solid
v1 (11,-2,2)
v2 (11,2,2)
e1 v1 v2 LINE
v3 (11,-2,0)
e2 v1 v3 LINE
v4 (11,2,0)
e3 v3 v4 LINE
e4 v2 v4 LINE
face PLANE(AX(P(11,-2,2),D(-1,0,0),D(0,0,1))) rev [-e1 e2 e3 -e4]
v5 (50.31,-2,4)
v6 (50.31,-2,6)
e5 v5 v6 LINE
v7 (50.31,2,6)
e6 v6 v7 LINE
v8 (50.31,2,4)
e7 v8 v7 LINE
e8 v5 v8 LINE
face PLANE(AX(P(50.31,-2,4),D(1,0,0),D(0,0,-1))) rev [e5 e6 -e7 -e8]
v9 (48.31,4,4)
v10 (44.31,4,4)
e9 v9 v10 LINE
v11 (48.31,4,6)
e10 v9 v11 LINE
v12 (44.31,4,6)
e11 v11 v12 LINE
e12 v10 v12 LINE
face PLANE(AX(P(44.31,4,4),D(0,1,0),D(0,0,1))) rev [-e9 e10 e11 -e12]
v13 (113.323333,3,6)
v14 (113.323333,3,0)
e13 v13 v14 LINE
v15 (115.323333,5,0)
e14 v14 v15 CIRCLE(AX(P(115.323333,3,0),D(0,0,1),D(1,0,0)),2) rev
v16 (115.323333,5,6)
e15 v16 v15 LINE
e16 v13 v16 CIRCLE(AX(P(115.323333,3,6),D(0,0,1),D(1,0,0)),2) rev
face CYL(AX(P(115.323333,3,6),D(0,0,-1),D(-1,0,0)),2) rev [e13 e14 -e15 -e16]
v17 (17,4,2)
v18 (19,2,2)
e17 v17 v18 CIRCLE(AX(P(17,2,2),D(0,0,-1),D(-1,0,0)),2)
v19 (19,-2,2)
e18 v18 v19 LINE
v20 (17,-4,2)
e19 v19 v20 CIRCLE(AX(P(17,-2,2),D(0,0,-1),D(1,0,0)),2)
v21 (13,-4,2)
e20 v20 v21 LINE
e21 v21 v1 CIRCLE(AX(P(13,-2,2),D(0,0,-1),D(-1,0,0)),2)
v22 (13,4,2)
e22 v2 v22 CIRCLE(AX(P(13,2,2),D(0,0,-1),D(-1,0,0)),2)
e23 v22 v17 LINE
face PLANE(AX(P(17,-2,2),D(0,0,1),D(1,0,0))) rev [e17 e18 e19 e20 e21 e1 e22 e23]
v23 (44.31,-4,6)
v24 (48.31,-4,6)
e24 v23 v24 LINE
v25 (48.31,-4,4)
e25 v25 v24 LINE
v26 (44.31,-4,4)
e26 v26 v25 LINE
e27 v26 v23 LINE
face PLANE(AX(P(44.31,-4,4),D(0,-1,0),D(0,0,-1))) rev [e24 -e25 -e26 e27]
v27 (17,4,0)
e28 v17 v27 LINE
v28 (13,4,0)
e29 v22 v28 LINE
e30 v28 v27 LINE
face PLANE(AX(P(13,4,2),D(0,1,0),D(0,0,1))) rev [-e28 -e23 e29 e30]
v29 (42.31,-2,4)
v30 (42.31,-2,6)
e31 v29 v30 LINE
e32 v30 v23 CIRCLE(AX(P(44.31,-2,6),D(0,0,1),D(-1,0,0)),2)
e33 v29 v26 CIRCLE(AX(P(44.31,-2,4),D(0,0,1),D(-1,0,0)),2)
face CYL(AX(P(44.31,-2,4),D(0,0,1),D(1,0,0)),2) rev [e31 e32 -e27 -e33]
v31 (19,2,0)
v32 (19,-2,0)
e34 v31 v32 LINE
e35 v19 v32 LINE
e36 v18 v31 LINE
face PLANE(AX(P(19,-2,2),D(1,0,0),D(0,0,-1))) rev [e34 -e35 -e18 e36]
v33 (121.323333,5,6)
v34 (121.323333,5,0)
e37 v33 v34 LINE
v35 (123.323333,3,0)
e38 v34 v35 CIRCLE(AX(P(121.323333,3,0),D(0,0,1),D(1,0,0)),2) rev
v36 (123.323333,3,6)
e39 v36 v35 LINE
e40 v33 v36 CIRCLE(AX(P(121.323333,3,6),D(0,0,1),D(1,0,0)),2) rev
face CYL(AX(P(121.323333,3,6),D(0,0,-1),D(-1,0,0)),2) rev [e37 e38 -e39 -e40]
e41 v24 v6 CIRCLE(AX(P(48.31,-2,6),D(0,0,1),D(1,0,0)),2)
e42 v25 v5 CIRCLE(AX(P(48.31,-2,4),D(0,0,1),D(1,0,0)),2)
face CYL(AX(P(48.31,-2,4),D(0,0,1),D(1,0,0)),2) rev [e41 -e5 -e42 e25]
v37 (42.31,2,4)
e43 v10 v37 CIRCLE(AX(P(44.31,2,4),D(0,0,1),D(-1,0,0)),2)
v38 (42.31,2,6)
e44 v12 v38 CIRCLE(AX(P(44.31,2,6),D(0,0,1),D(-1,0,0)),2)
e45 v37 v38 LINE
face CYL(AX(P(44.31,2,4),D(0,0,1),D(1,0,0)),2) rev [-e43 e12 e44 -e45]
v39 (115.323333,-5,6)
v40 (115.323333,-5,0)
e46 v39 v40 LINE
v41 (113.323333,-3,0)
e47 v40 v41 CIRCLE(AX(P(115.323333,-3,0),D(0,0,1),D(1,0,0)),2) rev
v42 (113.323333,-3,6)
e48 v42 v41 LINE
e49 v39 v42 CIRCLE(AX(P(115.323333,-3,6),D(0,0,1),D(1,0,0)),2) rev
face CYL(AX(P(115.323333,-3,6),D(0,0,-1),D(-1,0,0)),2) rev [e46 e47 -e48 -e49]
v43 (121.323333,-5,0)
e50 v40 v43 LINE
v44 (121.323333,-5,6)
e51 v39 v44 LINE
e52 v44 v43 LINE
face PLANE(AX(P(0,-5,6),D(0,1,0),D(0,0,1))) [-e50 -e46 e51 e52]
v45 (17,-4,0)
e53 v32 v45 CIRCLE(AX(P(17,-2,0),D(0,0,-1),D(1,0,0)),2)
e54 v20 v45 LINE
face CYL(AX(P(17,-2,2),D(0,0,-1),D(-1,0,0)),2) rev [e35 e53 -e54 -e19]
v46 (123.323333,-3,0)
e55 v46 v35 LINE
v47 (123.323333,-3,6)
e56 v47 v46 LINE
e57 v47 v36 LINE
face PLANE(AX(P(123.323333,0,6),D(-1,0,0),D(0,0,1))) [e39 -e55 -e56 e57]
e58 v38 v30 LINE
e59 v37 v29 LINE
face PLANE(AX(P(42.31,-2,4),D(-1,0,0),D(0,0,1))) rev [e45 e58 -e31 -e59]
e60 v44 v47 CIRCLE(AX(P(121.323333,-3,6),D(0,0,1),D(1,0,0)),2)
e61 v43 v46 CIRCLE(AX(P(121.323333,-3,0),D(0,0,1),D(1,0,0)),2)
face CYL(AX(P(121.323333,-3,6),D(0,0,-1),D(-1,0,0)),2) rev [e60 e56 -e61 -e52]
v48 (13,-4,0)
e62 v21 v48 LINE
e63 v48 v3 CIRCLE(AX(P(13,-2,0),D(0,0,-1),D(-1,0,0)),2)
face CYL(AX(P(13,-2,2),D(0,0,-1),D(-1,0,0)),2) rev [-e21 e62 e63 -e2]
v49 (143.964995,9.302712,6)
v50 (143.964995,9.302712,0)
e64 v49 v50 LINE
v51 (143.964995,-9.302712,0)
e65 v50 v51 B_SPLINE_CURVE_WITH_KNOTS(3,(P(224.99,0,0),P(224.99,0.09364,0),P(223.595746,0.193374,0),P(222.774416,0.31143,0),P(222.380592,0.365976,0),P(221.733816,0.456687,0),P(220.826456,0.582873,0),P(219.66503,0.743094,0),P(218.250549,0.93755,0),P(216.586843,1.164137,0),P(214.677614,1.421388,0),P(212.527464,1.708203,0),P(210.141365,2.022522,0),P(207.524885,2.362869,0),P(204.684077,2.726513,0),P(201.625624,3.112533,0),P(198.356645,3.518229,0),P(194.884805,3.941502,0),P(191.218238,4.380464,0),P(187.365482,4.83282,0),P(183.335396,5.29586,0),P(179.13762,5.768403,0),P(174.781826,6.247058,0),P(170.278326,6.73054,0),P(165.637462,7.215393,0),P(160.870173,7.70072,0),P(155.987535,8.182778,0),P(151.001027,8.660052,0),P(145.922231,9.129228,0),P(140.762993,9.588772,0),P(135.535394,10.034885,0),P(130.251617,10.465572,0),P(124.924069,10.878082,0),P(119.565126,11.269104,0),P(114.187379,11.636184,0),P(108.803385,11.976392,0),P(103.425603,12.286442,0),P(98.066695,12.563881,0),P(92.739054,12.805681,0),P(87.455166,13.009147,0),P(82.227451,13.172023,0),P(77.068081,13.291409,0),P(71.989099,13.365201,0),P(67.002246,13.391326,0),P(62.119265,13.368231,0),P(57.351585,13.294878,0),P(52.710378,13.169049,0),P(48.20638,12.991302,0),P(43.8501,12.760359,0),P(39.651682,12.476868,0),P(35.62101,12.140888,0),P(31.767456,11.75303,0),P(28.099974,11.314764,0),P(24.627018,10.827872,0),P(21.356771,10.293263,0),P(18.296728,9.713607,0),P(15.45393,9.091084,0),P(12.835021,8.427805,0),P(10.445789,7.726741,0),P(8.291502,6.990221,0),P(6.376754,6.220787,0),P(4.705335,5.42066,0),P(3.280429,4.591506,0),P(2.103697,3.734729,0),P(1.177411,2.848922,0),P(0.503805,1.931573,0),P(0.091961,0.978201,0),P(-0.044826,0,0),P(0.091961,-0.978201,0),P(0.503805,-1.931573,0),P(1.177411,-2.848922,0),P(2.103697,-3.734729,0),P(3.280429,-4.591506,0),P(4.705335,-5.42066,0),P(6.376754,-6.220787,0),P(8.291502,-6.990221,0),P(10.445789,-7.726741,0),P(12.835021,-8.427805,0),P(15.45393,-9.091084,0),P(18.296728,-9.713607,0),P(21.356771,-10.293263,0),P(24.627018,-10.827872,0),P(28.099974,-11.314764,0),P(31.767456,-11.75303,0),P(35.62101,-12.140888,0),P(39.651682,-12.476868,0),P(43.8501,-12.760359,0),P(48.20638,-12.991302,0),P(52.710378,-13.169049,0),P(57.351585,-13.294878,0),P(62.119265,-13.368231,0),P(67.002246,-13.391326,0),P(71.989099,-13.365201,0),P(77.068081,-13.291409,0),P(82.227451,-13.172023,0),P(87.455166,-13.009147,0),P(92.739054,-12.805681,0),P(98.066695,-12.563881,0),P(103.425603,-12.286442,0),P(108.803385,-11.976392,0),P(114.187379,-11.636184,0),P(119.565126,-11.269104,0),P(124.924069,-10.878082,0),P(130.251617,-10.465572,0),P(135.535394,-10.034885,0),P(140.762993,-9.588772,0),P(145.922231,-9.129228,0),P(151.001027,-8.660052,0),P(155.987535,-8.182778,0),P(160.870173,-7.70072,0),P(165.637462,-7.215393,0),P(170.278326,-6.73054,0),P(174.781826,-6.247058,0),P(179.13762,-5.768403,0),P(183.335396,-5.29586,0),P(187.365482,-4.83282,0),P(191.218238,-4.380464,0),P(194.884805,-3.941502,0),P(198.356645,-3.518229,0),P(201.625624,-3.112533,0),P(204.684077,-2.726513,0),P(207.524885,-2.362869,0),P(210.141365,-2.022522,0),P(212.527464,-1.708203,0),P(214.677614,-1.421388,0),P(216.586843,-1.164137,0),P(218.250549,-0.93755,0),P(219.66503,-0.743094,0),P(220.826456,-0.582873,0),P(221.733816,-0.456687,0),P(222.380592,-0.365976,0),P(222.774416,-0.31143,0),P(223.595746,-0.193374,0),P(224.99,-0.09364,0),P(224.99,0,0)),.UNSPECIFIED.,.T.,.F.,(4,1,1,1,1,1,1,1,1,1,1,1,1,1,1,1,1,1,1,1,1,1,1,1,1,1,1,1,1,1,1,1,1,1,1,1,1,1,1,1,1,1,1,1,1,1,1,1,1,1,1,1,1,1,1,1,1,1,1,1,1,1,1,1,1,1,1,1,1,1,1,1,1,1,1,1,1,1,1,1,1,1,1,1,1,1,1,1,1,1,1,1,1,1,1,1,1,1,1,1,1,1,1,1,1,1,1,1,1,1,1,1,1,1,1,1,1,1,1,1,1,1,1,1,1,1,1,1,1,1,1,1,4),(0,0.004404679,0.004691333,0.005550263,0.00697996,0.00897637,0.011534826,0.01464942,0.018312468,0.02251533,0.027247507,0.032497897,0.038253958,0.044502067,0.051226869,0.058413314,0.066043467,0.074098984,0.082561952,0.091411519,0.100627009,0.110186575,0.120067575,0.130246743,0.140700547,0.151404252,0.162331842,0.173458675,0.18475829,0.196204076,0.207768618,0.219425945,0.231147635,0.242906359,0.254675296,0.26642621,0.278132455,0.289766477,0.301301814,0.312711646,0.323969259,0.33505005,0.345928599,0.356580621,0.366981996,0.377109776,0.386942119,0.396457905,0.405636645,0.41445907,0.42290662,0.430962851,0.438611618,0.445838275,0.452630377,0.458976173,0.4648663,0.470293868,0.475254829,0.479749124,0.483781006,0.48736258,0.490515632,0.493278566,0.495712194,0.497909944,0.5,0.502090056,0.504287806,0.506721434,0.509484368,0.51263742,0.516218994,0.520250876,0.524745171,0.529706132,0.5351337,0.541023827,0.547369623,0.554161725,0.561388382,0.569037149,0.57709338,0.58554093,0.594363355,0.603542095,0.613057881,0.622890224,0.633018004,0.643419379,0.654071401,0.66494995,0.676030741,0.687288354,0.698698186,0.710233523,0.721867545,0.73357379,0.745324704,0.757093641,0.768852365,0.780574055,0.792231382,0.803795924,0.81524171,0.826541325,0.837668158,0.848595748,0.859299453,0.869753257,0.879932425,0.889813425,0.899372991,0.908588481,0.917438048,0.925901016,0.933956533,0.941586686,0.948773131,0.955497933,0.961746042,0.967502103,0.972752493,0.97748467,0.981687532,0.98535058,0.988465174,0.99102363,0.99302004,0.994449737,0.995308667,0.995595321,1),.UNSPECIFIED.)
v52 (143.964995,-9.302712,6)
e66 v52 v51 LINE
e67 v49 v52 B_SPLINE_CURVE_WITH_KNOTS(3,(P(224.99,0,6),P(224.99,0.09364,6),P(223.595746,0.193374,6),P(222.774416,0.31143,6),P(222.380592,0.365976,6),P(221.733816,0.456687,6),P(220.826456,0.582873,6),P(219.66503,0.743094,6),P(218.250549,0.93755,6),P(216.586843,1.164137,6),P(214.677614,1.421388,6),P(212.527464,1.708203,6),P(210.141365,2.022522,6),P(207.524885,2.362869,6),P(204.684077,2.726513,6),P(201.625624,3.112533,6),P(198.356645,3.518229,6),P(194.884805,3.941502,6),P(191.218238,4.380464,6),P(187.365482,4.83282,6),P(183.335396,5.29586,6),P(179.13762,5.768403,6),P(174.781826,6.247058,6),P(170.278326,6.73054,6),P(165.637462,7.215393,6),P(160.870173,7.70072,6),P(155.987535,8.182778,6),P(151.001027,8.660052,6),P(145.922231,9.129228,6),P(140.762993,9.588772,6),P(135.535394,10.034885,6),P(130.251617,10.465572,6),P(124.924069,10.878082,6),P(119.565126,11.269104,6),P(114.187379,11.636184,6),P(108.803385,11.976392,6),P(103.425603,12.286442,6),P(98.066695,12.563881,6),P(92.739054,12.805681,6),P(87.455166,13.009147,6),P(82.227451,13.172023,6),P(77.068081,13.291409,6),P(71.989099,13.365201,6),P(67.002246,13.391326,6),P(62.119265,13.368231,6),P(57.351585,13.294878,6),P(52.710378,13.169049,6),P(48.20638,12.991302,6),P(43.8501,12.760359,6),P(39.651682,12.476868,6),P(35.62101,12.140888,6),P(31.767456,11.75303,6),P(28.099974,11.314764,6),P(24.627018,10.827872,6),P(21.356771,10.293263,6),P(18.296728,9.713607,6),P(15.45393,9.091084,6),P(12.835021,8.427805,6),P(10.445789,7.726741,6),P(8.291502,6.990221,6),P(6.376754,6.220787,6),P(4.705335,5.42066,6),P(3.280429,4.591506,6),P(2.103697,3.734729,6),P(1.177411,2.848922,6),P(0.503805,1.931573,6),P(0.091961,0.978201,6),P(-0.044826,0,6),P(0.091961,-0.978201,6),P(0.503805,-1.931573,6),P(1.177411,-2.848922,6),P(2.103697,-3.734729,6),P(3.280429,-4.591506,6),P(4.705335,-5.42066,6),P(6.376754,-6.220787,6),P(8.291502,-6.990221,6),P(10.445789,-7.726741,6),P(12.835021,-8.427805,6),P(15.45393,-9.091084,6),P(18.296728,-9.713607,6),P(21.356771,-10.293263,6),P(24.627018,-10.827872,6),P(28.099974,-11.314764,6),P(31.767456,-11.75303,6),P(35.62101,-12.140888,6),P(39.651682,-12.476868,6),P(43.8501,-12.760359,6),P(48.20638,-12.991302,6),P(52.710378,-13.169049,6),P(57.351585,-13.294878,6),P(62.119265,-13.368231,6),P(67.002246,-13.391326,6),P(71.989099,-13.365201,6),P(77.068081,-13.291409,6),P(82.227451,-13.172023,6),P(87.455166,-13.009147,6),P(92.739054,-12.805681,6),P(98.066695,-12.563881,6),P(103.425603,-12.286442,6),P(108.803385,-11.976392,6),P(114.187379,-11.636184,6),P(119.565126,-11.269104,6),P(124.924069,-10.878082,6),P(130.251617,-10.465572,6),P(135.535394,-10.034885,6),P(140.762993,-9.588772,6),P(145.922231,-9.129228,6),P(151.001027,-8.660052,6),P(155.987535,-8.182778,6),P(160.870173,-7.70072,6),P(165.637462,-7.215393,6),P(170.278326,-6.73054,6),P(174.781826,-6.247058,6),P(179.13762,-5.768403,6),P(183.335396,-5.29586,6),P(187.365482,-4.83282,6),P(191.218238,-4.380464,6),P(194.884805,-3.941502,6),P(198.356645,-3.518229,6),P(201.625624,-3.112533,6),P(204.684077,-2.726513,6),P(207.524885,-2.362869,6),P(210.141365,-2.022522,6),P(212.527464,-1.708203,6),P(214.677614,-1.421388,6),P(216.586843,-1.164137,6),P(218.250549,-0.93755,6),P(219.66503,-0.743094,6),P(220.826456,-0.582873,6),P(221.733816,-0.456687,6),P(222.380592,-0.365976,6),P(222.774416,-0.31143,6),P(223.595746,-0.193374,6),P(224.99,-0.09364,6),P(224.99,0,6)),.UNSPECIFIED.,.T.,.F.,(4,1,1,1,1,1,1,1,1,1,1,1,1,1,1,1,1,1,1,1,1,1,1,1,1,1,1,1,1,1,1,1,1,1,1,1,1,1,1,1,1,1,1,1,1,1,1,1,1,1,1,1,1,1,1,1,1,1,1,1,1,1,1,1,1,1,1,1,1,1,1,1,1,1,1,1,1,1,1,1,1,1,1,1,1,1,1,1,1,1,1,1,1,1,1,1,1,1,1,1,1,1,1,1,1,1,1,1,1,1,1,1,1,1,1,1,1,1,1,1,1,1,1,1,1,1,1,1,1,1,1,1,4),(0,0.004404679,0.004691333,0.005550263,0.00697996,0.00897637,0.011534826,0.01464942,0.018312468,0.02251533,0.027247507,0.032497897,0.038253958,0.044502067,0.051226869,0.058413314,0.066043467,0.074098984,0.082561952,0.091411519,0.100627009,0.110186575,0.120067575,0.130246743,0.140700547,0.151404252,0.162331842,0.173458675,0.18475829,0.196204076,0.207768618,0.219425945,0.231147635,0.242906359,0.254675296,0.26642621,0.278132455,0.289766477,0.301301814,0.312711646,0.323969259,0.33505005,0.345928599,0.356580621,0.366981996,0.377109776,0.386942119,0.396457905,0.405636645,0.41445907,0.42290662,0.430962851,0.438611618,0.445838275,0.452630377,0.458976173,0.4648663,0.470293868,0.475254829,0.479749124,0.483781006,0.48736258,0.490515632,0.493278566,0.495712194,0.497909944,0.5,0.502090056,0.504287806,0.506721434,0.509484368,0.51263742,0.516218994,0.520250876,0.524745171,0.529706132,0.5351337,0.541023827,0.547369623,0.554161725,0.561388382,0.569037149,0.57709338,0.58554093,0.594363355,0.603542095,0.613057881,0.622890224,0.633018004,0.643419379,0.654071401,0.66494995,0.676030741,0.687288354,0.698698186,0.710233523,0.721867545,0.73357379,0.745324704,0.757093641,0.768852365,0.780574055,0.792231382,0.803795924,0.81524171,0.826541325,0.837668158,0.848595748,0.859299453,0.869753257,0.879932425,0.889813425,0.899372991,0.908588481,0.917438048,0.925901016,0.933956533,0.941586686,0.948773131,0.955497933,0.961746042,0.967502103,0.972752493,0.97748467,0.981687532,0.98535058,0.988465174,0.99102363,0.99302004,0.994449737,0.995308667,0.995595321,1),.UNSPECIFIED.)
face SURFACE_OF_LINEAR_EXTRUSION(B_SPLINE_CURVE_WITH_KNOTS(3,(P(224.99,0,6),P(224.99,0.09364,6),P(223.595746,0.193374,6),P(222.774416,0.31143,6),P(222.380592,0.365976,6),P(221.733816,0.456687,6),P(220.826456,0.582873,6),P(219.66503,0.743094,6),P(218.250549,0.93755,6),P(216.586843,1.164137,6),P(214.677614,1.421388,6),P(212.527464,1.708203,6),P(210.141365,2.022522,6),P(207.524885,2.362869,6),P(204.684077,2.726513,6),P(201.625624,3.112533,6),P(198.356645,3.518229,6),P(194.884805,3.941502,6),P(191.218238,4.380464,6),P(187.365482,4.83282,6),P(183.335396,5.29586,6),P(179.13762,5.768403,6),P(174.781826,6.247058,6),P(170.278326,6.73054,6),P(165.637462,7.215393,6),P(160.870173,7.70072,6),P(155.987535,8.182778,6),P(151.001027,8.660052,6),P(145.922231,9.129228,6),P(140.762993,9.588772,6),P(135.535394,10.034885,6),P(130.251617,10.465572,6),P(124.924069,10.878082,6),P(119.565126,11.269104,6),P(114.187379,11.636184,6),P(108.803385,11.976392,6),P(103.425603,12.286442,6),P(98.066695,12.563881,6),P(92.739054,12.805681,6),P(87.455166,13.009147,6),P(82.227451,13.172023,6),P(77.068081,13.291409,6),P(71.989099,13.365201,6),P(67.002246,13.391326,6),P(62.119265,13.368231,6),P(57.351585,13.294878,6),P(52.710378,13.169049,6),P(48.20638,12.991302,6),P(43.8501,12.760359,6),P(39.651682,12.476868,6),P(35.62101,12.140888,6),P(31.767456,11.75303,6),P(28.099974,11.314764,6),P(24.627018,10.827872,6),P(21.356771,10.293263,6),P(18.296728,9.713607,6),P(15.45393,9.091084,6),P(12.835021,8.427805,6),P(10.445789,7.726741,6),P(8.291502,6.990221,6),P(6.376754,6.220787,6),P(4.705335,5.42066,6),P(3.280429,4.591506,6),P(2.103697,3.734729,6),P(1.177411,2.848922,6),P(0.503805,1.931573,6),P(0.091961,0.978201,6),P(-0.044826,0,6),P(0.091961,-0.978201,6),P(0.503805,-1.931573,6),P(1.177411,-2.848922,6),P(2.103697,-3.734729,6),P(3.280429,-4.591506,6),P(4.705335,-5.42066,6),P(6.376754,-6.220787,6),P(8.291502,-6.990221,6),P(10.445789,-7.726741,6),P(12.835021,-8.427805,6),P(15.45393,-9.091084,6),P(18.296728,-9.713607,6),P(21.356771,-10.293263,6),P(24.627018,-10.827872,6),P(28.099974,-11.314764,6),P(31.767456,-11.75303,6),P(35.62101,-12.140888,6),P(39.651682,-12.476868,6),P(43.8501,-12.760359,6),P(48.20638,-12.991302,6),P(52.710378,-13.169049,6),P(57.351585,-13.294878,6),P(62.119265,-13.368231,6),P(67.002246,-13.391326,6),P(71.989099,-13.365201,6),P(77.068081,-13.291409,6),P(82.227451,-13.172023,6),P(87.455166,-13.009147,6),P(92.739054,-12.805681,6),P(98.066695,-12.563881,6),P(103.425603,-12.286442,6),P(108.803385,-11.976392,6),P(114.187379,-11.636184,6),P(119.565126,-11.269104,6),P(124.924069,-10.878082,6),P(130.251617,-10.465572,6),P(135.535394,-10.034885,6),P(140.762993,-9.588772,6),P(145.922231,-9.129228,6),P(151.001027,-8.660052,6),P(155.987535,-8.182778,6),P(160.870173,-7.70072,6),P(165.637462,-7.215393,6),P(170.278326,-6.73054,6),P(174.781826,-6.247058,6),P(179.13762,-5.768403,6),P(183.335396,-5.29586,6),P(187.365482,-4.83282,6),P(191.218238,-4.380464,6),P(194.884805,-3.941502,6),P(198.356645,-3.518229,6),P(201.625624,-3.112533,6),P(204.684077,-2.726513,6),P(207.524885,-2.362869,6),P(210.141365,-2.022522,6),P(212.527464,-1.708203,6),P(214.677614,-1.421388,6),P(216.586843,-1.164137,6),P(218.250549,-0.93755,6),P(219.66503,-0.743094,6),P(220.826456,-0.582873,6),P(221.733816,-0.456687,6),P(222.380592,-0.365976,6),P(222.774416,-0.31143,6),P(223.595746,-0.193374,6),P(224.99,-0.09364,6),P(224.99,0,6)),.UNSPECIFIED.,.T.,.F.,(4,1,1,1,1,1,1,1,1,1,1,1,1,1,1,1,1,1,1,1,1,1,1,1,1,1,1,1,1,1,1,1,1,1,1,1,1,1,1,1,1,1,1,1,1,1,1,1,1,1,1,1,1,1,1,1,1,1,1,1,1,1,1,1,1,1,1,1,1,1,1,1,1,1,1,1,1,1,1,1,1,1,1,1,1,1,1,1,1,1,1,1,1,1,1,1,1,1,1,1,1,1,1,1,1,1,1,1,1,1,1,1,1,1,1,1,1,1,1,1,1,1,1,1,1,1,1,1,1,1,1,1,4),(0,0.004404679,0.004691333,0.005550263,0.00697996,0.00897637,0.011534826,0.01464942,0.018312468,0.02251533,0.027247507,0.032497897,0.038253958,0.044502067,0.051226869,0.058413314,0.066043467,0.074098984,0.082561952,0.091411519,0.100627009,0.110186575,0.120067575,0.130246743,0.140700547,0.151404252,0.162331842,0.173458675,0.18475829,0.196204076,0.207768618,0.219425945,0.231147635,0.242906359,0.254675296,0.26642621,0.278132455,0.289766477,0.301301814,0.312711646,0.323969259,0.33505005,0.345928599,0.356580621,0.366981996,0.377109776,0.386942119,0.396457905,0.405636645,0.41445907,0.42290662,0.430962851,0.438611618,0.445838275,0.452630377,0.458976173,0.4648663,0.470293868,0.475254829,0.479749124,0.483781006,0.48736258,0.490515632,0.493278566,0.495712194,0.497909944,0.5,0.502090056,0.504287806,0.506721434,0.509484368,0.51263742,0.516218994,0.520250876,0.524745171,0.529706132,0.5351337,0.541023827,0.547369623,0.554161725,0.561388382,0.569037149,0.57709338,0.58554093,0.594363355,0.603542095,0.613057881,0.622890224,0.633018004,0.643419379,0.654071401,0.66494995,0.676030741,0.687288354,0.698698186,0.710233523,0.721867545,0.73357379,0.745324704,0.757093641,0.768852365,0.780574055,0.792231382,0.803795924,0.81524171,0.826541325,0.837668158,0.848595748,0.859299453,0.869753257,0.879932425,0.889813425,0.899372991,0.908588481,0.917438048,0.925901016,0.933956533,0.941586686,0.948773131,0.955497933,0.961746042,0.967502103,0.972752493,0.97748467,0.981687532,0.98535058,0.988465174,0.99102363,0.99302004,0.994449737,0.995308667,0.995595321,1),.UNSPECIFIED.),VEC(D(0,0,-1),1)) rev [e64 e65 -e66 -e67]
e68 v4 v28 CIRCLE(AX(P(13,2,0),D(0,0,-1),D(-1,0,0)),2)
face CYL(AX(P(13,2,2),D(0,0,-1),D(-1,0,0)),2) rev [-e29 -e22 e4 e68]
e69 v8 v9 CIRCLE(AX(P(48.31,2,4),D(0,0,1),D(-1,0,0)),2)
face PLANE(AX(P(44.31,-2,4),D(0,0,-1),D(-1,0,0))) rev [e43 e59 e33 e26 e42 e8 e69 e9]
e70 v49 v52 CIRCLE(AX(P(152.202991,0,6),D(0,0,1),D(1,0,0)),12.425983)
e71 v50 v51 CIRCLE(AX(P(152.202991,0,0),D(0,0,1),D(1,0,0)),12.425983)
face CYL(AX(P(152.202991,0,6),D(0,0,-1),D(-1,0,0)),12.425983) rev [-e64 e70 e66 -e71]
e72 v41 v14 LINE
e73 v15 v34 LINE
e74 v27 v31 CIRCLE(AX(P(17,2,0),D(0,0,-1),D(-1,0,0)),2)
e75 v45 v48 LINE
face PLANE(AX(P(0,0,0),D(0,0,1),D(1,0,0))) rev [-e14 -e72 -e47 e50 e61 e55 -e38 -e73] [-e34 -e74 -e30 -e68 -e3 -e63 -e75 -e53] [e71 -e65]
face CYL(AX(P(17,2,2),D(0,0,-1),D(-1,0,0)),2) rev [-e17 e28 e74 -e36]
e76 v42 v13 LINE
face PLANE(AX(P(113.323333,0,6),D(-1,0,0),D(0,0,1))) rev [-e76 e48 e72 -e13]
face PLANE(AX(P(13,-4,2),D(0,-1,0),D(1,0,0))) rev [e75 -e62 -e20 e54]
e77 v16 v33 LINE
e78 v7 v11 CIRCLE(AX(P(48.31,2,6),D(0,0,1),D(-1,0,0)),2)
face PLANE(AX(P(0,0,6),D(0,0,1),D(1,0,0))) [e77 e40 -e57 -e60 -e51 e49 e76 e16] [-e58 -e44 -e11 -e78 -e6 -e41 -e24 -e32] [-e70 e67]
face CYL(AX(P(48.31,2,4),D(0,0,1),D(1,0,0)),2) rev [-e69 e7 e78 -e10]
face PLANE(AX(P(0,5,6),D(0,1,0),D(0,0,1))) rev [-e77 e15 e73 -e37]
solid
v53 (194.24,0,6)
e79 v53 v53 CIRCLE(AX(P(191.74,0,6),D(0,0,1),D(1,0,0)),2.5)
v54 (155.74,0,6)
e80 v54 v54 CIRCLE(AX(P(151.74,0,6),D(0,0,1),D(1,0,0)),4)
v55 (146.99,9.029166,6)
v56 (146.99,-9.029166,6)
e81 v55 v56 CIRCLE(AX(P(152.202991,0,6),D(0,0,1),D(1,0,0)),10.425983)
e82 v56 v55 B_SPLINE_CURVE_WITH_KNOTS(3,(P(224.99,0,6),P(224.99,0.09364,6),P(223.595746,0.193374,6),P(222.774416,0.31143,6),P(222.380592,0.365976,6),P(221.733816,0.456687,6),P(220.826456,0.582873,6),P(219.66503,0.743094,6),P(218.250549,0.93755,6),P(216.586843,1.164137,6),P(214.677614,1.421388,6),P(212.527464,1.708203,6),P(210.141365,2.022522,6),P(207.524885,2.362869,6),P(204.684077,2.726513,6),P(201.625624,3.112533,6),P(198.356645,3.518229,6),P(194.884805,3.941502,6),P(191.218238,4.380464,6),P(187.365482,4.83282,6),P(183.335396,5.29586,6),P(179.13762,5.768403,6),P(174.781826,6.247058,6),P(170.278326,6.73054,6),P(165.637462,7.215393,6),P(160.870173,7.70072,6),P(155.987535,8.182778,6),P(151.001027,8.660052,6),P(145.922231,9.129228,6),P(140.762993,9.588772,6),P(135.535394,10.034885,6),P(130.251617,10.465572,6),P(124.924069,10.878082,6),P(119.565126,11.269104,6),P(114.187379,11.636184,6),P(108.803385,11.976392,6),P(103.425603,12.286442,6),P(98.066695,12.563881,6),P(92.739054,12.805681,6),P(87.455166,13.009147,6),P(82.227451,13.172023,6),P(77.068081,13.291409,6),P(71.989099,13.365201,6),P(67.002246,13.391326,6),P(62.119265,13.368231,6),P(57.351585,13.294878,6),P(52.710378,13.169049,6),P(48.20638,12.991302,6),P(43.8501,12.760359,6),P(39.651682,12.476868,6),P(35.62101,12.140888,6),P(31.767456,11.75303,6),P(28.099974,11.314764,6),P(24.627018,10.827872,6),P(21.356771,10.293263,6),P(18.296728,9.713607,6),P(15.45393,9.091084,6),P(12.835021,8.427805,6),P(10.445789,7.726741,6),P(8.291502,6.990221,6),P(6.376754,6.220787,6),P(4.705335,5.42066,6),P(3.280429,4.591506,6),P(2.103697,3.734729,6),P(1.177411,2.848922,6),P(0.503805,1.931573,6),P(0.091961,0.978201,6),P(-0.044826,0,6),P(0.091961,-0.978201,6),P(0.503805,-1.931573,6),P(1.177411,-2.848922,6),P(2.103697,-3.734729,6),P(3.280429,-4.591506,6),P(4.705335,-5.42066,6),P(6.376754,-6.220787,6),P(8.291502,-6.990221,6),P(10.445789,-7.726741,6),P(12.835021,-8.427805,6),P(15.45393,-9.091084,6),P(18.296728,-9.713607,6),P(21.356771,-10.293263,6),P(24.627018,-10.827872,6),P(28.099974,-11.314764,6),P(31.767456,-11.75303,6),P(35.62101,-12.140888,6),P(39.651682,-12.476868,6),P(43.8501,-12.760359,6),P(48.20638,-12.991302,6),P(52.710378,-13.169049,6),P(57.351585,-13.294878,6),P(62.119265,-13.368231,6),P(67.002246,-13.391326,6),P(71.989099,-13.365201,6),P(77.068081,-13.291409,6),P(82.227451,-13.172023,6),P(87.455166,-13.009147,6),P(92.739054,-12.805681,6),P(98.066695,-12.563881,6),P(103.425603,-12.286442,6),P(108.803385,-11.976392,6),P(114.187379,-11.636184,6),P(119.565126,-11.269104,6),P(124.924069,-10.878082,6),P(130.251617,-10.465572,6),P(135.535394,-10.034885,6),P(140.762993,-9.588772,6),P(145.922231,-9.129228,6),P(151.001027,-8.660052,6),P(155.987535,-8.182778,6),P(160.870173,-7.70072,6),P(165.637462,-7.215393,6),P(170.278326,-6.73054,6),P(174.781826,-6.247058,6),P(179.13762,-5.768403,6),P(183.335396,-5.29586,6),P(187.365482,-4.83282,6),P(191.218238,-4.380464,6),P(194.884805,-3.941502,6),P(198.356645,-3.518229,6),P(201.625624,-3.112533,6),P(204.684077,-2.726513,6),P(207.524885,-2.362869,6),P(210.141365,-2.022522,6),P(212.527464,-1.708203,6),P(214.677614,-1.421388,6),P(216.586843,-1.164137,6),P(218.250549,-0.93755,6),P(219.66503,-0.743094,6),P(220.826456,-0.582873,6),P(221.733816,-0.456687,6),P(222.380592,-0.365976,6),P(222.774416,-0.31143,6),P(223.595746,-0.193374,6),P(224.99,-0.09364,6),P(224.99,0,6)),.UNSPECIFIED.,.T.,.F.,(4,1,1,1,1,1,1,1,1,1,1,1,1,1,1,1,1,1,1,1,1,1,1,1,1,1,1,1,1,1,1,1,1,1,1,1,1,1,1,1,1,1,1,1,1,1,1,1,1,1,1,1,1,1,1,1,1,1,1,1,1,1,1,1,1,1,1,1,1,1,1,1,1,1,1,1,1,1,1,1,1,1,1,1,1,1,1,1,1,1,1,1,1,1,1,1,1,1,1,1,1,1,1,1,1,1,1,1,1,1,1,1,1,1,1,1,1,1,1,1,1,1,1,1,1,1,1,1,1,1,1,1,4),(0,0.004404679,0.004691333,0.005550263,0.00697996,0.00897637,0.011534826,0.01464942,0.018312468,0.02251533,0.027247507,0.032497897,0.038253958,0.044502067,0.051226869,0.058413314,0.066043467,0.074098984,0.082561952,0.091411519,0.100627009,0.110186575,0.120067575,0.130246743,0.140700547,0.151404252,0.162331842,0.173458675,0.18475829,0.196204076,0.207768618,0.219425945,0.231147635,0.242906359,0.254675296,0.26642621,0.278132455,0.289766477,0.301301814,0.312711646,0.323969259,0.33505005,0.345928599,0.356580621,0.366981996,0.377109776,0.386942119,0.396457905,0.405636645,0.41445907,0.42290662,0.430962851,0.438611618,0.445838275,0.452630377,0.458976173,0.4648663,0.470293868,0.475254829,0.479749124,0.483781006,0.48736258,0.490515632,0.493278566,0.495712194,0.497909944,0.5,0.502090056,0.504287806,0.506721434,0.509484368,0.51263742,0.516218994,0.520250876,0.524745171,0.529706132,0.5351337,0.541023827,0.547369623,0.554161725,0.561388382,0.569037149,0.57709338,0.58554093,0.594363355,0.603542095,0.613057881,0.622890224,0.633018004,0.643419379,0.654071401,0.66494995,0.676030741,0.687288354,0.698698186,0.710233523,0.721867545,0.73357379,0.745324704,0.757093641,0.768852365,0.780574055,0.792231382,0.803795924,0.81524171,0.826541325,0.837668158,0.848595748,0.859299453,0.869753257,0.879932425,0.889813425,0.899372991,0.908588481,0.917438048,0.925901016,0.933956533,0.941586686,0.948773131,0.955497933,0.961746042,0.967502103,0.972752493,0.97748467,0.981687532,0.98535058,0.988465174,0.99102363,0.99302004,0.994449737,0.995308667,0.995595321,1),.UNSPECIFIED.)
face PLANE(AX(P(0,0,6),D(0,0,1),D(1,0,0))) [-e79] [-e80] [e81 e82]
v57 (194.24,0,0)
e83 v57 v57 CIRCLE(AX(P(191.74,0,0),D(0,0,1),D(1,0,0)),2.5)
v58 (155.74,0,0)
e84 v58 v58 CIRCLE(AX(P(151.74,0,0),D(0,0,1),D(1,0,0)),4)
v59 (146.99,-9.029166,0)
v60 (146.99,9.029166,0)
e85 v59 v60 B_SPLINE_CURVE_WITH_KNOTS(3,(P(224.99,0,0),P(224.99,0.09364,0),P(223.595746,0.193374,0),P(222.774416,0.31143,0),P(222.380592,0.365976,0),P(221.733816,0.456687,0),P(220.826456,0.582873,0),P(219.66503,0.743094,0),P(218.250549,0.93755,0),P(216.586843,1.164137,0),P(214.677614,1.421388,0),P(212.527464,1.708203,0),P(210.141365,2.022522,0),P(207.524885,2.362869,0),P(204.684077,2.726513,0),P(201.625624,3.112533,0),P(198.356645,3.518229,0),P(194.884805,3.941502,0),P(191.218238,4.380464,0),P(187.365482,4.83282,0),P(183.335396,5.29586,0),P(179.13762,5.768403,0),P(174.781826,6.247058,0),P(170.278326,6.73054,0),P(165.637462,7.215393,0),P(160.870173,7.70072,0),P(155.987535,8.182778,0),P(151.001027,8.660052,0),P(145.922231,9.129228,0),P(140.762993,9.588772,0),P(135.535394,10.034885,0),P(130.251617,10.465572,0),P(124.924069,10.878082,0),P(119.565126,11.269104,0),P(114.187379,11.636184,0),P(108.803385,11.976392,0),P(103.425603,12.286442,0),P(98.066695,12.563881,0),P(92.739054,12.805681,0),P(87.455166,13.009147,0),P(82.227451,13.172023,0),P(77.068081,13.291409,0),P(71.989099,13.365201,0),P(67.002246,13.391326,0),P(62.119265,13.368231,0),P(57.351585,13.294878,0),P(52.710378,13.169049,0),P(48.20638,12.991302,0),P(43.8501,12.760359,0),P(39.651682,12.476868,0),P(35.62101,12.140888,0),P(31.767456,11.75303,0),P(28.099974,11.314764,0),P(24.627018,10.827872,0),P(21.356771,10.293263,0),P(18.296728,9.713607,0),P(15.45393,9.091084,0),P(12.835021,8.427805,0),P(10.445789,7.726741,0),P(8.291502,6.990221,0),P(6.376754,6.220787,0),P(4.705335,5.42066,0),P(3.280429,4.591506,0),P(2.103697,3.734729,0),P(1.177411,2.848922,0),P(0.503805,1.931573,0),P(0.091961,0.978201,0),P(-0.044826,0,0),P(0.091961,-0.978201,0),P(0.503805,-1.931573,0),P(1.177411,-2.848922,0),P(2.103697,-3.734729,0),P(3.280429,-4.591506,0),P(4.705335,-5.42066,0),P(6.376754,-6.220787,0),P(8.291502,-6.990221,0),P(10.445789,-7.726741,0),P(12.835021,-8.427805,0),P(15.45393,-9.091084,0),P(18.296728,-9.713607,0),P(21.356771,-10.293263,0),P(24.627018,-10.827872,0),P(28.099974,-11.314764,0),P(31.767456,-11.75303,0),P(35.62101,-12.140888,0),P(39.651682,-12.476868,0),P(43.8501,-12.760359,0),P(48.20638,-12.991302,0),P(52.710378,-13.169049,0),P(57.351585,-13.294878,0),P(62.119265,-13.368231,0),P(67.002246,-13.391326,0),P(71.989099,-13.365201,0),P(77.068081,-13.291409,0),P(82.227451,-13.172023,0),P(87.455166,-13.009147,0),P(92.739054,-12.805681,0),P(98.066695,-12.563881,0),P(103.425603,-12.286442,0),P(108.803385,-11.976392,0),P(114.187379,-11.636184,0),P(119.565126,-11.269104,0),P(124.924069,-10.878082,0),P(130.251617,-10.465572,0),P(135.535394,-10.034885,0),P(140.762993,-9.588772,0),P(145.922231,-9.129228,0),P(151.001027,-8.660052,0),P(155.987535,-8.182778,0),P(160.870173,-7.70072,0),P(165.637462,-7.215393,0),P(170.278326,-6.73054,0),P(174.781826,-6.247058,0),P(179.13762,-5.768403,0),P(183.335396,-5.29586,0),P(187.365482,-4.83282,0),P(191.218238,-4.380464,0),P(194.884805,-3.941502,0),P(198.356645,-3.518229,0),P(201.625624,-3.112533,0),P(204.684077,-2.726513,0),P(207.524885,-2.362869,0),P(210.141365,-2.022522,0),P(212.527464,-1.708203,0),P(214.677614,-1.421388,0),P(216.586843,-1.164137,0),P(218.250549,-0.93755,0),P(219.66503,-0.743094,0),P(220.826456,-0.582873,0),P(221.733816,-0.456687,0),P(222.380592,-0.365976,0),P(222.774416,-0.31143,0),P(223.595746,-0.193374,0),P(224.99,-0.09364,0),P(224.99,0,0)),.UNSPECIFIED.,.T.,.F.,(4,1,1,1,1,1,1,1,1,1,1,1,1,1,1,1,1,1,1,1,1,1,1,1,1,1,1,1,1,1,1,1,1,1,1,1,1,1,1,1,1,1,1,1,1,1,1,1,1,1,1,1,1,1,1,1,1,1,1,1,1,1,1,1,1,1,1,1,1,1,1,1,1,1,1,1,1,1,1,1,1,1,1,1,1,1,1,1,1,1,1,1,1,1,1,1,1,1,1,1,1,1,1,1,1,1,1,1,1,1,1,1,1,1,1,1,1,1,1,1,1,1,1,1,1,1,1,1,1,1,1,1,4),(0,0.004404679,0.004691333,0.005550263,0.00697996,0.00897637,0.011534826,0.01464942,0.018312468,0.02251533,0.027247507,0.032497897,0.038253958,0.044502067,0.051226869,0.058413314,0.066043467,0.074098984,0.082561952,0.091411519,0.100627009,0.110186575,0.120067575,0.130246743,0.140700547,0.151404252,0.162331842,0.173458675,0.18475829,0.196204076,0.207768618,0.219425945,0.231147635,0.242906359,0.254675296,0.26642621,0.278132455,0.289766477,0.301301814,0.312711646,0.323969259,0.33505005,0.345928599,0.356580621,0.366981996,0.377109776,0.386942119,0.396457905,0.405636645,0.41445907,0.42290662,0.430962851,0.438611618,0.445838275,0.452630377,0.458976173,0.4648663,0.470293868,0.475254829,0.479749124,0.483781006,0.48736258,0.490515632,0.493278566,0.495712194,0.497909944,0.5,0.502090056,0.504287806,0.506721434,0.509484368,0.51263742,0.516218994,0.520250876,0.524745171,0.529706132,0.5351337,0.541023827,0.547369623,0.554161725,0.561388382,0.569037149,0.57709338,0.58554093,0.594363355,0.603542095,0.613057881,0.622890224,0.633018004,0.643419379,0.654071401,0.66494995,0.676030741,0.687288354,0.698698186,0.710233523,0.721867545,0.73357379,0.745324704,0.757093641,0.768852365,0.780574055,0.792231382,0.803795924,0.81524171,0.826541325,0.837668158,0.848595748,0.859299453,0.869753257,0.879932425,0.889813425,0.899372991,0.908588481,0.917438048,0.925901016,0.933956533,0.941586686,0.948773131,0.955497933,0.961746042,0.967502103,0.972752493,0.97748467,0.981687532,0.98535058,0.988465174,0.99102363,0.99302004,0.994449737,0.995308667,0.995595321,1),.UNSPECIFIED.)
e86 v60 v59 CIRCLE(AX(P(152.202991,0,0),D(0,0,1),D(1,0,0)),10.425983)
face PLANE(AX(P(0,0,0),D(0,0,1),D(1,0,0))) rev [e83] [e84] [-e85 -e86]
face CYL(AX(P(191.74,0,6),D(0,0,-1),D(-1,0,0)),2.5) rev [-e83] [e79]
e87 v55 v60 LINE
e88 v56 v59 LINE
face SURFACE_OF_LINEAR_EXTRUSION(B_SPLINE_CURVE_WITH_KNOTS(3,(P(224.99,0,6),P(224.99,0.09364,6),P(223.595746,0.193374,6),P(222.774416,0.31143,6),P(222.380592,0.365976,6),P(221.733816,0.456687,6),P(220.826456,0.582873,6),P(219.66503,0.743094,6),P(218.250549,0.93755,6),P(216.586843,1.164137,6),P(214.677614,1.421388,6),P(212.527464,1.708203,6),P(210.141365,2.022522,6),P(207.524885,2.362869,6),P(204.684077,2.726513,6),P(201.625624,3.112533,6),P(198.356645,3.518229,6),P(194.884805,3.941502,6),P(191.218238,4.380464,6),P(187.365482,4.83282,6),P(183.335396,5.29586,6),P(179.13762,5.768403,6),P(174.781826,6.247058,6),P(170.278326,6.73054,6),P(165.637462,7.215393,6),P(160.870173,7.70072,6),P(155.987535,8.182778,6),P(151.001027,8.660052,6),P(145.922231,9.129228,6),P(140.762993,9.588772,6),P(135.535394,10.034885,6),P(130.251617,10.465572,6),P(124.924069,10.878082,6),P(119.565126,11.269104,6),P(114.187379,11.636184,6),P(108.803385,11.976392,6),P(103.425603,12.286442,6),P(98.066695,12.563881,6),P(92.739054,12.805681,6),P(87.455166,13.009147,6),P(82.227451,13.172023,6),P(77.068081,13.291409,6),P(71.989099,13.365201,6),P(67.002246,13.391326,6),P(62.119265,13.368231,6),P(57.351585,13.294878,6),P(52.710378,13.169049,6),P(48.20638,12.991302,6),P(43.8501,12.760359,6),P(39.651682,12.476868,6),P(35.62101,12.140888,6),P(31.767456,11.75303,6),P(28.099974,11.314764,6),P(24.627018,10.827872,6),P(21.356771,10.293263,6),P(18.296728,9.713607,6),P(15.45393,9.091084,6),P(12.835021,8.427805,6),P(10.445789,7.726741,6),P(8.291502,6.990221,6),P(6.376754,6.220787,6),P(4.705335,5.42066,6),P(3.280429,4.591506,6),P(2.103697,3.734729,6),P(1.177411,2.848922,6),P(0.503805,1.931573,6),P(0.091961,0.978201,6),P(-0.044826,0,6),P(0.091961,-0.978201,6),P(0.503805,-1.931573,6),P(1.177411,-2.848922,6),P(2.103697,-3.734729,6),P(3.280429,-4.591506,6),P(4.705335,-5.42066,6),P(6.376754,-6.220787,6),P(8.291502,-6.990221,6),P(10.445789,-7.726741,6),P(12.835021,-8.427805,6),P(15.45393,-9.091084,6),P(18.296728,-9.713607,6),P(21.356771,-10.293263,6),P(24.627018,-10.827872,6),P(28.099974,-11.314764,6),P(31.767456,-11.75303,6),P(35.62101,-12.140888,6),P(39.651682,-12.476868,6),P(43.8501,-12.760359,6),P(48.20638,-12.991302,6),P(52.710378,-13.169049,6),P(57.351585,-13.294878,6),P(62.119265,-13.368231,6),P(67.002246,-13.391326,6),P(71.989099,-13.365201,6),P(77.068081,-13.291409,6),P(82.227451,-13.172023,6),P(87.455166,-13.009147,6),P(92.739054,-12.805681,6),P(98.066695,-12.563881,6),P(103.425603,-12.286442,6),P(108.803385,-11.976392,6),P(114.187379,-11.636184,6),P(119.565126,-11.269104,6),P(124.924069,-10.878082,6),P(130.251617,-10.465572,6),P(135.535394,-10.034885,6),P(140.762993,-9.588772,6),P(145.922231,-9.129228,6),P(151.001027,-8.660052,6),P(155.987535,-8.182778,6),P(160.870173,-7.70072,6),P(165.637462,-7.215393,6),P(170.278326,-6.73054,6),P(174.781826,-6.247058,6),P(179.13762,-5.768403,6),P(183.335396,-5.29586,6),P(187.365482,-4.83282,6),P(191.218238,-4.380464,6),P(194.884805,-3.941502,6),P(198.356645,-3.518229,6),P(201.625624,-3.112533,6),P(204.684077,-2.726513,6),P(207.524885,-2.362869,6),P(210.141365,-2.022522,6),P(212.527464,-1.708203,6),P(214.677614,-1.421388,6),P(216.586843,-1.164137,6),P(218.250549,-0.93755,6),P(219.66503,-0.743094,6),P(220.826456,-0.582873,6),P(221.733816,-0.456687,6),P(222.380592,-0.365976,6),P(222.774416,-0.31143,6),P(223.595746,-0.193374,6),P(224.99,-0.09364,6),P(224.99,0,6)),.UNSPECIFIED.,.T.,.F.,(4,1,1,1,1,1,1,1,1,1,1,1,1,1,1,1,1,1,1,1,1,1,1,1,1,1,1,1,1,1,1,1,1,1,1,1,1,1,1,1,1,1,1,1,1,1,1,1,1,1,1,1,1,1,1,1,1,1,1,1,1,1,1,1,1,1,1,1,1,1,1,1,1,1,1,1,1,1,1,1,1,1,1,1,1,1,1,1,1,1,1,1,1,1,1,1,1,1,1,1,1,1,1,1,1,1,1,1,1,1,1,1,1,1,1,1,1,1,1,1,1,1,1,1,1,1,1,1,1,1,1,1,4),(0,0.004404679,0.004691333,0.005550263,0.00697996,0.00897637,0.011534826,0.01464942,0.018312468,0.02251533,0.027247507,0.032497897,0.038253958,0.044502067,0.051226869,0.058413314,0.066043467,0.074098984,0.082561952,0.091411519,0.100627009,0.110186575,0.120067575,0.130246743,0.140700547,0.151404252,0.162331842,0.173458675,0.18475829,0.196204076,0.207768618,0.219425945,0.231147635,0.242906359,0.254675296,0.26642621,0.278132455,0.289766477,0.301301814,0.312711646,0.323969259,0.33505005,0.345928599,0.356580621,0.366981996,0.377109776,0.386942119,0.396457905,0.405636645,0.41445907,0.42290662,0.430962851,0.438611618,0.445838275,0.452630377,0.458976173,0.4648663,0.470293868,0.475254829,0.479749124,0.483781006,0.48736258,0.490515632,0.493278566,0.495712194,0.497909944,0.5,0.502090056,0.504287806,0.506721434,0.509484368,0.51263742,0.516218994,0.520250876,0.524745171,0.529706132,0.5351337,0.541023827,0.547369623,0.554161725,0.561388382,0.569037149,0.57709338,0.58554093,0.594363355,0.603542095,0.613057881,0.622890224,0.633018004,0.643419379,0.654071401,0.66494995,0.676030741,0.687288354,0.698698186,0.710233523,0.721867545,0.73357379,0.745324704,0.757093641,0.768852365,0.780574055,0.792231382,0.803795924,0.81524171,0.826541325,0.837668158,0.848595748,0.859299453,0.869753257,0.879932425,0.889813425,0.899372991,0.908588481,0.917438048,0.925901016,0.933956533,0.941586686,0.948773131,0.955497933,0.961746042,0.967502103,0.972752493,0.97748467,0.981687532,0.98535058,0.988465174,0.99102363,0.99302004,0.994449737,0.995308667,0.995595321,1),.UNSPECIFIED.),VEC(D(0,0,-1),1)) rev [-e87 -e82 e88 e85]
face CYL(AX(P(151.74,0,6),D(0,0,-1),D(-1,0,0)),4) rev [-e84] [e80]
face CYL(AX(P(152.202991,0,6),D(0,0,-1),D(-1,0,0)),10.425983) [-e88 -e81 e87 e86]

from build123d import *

# Parameters (mm, degrees)
RESSALTO_EXTRUS_O1_OUTLINE_R   = 4
RESSALTO_EXTRUS_O1_OUTLINE_R_2 = 2.5
RESSALTO_EXTRUS_O1_DEPTH       = 6
CORTE_EXTRUS_O1_DEPTH          = 2
CORTE_EXTRUS_O2_DEPTH          = 2


# Read off the part's stored shape, not the designer's step: Ressalto-extrusão1
with BuildPart() as part:
    # Ressalto-extrusão1 outline → Ressalto-extrusão1 (new body)
    # profile 1 of 2: a face of its own
    with BuildSketch(Plane.XY):
        with BuildLine():
            ThreePointArc((146.99, 9.029165979), (141.777008591, 0), (146.99, -9.029165979))
            add(Edge.make_bspline(
                [(146.99, -9.029165979), (148.337196309, -8.906015417), (151.348115525, -8.626831029), (155.987534716, -8.182777655), (160.870173109, -7.700720132), (165.637462146, -7.215393432), (170.278326288, -6.730539905), (174.781826014, -6.2470581), (179.137619624, -5.768403016), (183.335395872, -5.295860237), (187.365482473, -4.83281959), (191.218237662, -4.380463556), (194.884804675, -3.941502002), (198.356644789, -3.518228575), (201.625623904, -3.112532704), (204.684077394, -2.726512639), (207.524885018, -2.36286915), (210.14136538, -2.022521824), (212.527464364, -1.7082026), (214.67761399, -1.421387938), (216.586842947, -1.164136985), (218.250549273, -0.937549825), (219.665029799, -0.743094035), (220.826456392, -0.582872783), (221.733815917, -0.456686871), (222.380592332, -0.365976445), (222.774416409, -0.311430203), (223.595746131, -0.193373846), (224.99, -0.093639909), (224.99, 0), (224.99, 0.093639909), (223.595746131, 0.193373846), (222.774416409, 0.311430203), (222.380592332, 0.365976445), (221.733815917, 0.456686871), (220.826456392, 0.582872783), (219.665029799, 0.743094035), (218.250549273, 0.937549825), (216.586842947, 1.164136985), (214.67761399, 1.421387938), (212.527464364, 1.7082026), (210.14136538, 2.022521824), (207.524885018, 2.36286915), (204.684077394, 2.726512639), (201.625623904, 3.112532704), (198.356644789, 3.518228575), (194.884804675, 3.941502002), (191.218237662, 4.380463556), (187.365482473, 4.83281959), (183.335395872, 5.295860237), (179.137619624, 5.768403016), (174.781826014, 6.2470581), (170.278326288, 6.730539905), (165.637462146, 7.215393432), (160.870173109, 7.700720132), (155.987534716, 8.182777655), (151.348115525, 8.626831029), (148.337196309, 8.906015417), (146.99, 9.029165979)],
                knots=[0.828821469, 0.828821469, 0.828821469, 0.828821469, 0.837668158, 0.848595748, 0.859299453, 0.869753257, 0.879932425, 0.889813425, 0.899372991, 0.908588481, 0.917438048, 0.925901016, 0.933956533, 0.941586686, 0.948773131, 0.955497933, 0.961746042, 0.967502103, 0.972752493, 0.97748467, 0.981687532, 0.98535058, 0.988465174, 0.99102363, 0.99302004, 0.994449737, 0.995308667, 0.995595321, 1, 1, 1, 1.004404679, 1.004691333, 1.005550263, 1.00697996, 1.00897637, 1.011534826, 1.01464942, 1.018312468, 1.02251533, 1.027247507, 1.032497897, 1.038253958, 1.044502067, 1.051226869, 1.058413314, 1.066043467, 1.074098984, 1.082561952, 1.091411519, 1.100627009, 1.110186575, 1.120067575, 1.130246743, 1.140700547, 1.151404252, 1.162331842, 1.171178531, 1.171178531, 1.171178531, 1.171178531], degree=3))
        make_face()
        with Locations((151.74, 0)):
            Circle(RESSALTO_EXTRUS_O1_OUTLINE_R, mode=Mode.SUBTRACT)
        with Locations((191.74, 0)):
            Circle(RESSALTO_EXTRUS_O1_OUTLINE_R_2, mode=Mode.SUBTRACT)
    # profile 2 of 2: a face of its own
    with BuildSketch(Plane.XY):
        with BuildLine():
            add(Edge.make_bspline(
                [(143.964994718, 9.302712481), (142.90509191, 9.397499692), (140.101619629, 9.645212543), (135.535393921, 10.034885393), (130.251617052, 10.465572126), (124.924069364, 10.878081993), (119.565125585, 11.269103587), (114.187379479, 11.636184419), (108.803384618, 11.97639239), (103.425603277, 12.286441798), (98.066695173, 12.563880807), (92.739053945, 12.805680563), (87.455166071, 13.009147456), (82.227451256, 13.172022599), (77.068080741, 13.291408803), (71.989099485, 13.365201426), (67.002246064, 13.391326373), (62.119265292, 13.368231286), (57.351585182, 13.294877783), (52.710377932, 13.169049052), (48.20637983, 12.991301931), (43.85010036, 12.760359239), (39.651681503, 12.476868277), (35.621009576, 12.140888181), (31.767455659, 11.753029561), (28.099973601, 11.314763782), (24.627018393, 10.827872246), (21.356771486, 10.293262571), (18.296727667, 9.713606658), (15.453929575, 9.09108409), (12.835021062, 8.427805154), (10.445789101, 7.726741241), (8.291501945, 6.990220568), (6.376753729, 6.220786923), (4.705334783, 5.420659975), (3.280429379, 4.591505551), (2.103696759, 3.734729228), (1.177410691, 2.848921658), (0.503804939, 1.931573496), (0.091961319, 0.978200852), (-0.044825797, 0), (0.091961319, -0.978200852), (0.503804939, -1.931573496), (1.177410691, -2.848921658), (2.103696759, -3.734729228), (3.280429379, -4.591505551), (4.705334783, -5.420659975), (6.376753729, -6.220786923), (8.291501945, -6.990220568), (10.445789101, -7.726741241), (12.835021062, -8.427805154), (15.453929575, -9.09108409), (18.296727667, -9.713606658), (21.356771486, -10.293262571), (24.627018393, -10.827872246), (28.099973601, -11.314763782), (31.767455659, -11.753029561), (35.621009576, -12.140888181), (39.651681503, -12.476868277), (43.85010036, -12.760359239), (48.20637983, -12.991301931), (52.710377932, -13.169049052), (57.351585182, -13.294877783), (62.119265292, -13.368231286), (67.002246064, -13.391326373), (71.989099485, -13.365201426), (77.068080741, -13.291408803), (82.227451256, -13.172022599), (87.455166071, -13.009147456), (92.739053945, -12.805680563), (98.066695173, -12.563880807), (103.425603277, -12.286441798), (108.803384618, -11.97639239), (114.187379479, -11.636184419), (119.565125585, -11.269103587), (124.924069364, -10.878081993), (130.251617052, -10.465572126), (135.535393921, -10.034885393), (140.101619629, -9.645212543), (142.90509191, -9.397499692), (143.964994718, -9.302712481)],
                knots=[0.17779942, 0.17779942, 0.17779942, 0.17779942, 0.18475829, 0.196204076, 0.207768618, 0.219425945, 0.231147635, 0.242906359, 0.254675296, 0.26642621, 0.278132455, 0.289766477, 0.301301814, 0.312711646, 0.323969259, 0.33505005, 0.345928599, 0.356580621, 0.366981996, 0.377109776, 0.386942119, 0.396457905, 0.405636645, 0.41445907, 0.42290662, 0.430962851, 0.438611618, 0.445838275, 0.452630377, 0.458976173, 0.4648663, 0.470293868, 0.475254829, 0.479749124, 0.483781006, 0.48736258, 0.490515632, 0.493278566, 0.495712194, 0.497909944, 0.5, 0.502090056, 0.504287806, 0.506721434, 0.509484368, 0.51263742, 0.516218994, 0.520250876, 0.524745171, 0.529706132, 0.5351337, 0.541023827, 0.547369623, 0.554161725, 0.561388382, 0.569037149, 0.57709338, 0.58554093, 0.594363355, 0.603542095, 0.613057881, 0.622890224, 0.633018004, 0.643419379, 0.654071401, 0.66494995, 0.676030741, 0.687288354, 0.698698186, 0.710233523, 0.721867545, 0.73357379, 0.745324704, 0.757093641, 0.768852365, 0.780574055, 0.792231382, 0.803795924, 0.81524171, 0.82220058, 0.82220058, 0.82220058, 0.82220058], degree=3))
            ThreePointArc((143.964994718, -9.302712481), (139.777008591, 0), (143.964994718, 9.302712481))
        make_face()
        with BuildLine():
            Line((113.3233333, -3), (113.3233333, 3))
            ThreePointArc((113.3233333, 3), (113.909119738, 4.414213562), (115.3233333, 5))
            Line((115.3233333, 5), (121.3233333, 5))
            ThreePointArc((121.3233333, 5), (122.737546862, 4.414213562), (123.3233333, 3))
            Line((123.3233333, 3), (123.3233333, -3))
            ThreePointArc((123.3233333, -3), (122.737546862, -4.414213562), (121.3233333, -5))
            Line((121.3233333, -5), (115.3233333, -5))
            ThreePointArc((115.3233333, -5), (113.909119738, -4.414213562), (113.3233333, -3))
        make_face(mode=Mode.SUBTRACT)
    extrude(amount=RESSALTO_EXTRUS_O1_DEPTH)

    # Esboço3 → Corte-extrusão1 (cut)
    with BuildSketch(Plane(origin=(0, 0, 0), x_dir=(-1, 0, 0), z_dir=(0, 0, -1))):
        with BuildLine():
            Line((-13, -4), (-17, -4))
            ThreePointArc((-17, -4), (-18.414213562, -3.414213562), (-19, -2))
            Line((-19, -2), (-19, 2))
            ThreePointArc((-19, 2), (-18.414213562, 3.414213562), (-17, 4))
            Line((-17, 4), (-13, 4))
            ThreePointArc((-13, 4), (-11.585786438, 3.414213562), (-11, 2))
            Line((-11, 2), (-11, -2))
            ThreePointArc((-11, -2), (-11.585786438, -3.414213562), (-13, -4))
        make_face()
    extrude(amount=-CORTE_EXTRUS_O1_DEPTH, mode=Mode.SUBTRACT)

    # Esboço4 → Corte-extrusão2 (cut)
    with BuildSketch(Plane.XY.offset(6)):
        with BuildLine():
            Line((44.31, -4), (48.31, -4))
            ThreePointArc((48.31, -4), (49.724213562, -3.414213562), (50.31, -2))
            Line((50.31, -2), (50.31, 2))
            ThreePointArc((50.31, 2), (49.724213562, 3.414213562), (48.31, 4))
            Line((48.31, 4), (44.31, 4))
            ThreePointArc((44.31, 4), (42.895786438, 3.414213562), (42.31, 2))
            Line((42.31, 2), (42.31, -2))
            ThreePointArc((42.31, -2), (42.895786438, -3.414213562), (44.31, -4))
        make_face()
    extrude(amount=-CORTE_EXTRUS_O2_DEPTH, mode=Mode.SUBTRACT)


solid = part.part
